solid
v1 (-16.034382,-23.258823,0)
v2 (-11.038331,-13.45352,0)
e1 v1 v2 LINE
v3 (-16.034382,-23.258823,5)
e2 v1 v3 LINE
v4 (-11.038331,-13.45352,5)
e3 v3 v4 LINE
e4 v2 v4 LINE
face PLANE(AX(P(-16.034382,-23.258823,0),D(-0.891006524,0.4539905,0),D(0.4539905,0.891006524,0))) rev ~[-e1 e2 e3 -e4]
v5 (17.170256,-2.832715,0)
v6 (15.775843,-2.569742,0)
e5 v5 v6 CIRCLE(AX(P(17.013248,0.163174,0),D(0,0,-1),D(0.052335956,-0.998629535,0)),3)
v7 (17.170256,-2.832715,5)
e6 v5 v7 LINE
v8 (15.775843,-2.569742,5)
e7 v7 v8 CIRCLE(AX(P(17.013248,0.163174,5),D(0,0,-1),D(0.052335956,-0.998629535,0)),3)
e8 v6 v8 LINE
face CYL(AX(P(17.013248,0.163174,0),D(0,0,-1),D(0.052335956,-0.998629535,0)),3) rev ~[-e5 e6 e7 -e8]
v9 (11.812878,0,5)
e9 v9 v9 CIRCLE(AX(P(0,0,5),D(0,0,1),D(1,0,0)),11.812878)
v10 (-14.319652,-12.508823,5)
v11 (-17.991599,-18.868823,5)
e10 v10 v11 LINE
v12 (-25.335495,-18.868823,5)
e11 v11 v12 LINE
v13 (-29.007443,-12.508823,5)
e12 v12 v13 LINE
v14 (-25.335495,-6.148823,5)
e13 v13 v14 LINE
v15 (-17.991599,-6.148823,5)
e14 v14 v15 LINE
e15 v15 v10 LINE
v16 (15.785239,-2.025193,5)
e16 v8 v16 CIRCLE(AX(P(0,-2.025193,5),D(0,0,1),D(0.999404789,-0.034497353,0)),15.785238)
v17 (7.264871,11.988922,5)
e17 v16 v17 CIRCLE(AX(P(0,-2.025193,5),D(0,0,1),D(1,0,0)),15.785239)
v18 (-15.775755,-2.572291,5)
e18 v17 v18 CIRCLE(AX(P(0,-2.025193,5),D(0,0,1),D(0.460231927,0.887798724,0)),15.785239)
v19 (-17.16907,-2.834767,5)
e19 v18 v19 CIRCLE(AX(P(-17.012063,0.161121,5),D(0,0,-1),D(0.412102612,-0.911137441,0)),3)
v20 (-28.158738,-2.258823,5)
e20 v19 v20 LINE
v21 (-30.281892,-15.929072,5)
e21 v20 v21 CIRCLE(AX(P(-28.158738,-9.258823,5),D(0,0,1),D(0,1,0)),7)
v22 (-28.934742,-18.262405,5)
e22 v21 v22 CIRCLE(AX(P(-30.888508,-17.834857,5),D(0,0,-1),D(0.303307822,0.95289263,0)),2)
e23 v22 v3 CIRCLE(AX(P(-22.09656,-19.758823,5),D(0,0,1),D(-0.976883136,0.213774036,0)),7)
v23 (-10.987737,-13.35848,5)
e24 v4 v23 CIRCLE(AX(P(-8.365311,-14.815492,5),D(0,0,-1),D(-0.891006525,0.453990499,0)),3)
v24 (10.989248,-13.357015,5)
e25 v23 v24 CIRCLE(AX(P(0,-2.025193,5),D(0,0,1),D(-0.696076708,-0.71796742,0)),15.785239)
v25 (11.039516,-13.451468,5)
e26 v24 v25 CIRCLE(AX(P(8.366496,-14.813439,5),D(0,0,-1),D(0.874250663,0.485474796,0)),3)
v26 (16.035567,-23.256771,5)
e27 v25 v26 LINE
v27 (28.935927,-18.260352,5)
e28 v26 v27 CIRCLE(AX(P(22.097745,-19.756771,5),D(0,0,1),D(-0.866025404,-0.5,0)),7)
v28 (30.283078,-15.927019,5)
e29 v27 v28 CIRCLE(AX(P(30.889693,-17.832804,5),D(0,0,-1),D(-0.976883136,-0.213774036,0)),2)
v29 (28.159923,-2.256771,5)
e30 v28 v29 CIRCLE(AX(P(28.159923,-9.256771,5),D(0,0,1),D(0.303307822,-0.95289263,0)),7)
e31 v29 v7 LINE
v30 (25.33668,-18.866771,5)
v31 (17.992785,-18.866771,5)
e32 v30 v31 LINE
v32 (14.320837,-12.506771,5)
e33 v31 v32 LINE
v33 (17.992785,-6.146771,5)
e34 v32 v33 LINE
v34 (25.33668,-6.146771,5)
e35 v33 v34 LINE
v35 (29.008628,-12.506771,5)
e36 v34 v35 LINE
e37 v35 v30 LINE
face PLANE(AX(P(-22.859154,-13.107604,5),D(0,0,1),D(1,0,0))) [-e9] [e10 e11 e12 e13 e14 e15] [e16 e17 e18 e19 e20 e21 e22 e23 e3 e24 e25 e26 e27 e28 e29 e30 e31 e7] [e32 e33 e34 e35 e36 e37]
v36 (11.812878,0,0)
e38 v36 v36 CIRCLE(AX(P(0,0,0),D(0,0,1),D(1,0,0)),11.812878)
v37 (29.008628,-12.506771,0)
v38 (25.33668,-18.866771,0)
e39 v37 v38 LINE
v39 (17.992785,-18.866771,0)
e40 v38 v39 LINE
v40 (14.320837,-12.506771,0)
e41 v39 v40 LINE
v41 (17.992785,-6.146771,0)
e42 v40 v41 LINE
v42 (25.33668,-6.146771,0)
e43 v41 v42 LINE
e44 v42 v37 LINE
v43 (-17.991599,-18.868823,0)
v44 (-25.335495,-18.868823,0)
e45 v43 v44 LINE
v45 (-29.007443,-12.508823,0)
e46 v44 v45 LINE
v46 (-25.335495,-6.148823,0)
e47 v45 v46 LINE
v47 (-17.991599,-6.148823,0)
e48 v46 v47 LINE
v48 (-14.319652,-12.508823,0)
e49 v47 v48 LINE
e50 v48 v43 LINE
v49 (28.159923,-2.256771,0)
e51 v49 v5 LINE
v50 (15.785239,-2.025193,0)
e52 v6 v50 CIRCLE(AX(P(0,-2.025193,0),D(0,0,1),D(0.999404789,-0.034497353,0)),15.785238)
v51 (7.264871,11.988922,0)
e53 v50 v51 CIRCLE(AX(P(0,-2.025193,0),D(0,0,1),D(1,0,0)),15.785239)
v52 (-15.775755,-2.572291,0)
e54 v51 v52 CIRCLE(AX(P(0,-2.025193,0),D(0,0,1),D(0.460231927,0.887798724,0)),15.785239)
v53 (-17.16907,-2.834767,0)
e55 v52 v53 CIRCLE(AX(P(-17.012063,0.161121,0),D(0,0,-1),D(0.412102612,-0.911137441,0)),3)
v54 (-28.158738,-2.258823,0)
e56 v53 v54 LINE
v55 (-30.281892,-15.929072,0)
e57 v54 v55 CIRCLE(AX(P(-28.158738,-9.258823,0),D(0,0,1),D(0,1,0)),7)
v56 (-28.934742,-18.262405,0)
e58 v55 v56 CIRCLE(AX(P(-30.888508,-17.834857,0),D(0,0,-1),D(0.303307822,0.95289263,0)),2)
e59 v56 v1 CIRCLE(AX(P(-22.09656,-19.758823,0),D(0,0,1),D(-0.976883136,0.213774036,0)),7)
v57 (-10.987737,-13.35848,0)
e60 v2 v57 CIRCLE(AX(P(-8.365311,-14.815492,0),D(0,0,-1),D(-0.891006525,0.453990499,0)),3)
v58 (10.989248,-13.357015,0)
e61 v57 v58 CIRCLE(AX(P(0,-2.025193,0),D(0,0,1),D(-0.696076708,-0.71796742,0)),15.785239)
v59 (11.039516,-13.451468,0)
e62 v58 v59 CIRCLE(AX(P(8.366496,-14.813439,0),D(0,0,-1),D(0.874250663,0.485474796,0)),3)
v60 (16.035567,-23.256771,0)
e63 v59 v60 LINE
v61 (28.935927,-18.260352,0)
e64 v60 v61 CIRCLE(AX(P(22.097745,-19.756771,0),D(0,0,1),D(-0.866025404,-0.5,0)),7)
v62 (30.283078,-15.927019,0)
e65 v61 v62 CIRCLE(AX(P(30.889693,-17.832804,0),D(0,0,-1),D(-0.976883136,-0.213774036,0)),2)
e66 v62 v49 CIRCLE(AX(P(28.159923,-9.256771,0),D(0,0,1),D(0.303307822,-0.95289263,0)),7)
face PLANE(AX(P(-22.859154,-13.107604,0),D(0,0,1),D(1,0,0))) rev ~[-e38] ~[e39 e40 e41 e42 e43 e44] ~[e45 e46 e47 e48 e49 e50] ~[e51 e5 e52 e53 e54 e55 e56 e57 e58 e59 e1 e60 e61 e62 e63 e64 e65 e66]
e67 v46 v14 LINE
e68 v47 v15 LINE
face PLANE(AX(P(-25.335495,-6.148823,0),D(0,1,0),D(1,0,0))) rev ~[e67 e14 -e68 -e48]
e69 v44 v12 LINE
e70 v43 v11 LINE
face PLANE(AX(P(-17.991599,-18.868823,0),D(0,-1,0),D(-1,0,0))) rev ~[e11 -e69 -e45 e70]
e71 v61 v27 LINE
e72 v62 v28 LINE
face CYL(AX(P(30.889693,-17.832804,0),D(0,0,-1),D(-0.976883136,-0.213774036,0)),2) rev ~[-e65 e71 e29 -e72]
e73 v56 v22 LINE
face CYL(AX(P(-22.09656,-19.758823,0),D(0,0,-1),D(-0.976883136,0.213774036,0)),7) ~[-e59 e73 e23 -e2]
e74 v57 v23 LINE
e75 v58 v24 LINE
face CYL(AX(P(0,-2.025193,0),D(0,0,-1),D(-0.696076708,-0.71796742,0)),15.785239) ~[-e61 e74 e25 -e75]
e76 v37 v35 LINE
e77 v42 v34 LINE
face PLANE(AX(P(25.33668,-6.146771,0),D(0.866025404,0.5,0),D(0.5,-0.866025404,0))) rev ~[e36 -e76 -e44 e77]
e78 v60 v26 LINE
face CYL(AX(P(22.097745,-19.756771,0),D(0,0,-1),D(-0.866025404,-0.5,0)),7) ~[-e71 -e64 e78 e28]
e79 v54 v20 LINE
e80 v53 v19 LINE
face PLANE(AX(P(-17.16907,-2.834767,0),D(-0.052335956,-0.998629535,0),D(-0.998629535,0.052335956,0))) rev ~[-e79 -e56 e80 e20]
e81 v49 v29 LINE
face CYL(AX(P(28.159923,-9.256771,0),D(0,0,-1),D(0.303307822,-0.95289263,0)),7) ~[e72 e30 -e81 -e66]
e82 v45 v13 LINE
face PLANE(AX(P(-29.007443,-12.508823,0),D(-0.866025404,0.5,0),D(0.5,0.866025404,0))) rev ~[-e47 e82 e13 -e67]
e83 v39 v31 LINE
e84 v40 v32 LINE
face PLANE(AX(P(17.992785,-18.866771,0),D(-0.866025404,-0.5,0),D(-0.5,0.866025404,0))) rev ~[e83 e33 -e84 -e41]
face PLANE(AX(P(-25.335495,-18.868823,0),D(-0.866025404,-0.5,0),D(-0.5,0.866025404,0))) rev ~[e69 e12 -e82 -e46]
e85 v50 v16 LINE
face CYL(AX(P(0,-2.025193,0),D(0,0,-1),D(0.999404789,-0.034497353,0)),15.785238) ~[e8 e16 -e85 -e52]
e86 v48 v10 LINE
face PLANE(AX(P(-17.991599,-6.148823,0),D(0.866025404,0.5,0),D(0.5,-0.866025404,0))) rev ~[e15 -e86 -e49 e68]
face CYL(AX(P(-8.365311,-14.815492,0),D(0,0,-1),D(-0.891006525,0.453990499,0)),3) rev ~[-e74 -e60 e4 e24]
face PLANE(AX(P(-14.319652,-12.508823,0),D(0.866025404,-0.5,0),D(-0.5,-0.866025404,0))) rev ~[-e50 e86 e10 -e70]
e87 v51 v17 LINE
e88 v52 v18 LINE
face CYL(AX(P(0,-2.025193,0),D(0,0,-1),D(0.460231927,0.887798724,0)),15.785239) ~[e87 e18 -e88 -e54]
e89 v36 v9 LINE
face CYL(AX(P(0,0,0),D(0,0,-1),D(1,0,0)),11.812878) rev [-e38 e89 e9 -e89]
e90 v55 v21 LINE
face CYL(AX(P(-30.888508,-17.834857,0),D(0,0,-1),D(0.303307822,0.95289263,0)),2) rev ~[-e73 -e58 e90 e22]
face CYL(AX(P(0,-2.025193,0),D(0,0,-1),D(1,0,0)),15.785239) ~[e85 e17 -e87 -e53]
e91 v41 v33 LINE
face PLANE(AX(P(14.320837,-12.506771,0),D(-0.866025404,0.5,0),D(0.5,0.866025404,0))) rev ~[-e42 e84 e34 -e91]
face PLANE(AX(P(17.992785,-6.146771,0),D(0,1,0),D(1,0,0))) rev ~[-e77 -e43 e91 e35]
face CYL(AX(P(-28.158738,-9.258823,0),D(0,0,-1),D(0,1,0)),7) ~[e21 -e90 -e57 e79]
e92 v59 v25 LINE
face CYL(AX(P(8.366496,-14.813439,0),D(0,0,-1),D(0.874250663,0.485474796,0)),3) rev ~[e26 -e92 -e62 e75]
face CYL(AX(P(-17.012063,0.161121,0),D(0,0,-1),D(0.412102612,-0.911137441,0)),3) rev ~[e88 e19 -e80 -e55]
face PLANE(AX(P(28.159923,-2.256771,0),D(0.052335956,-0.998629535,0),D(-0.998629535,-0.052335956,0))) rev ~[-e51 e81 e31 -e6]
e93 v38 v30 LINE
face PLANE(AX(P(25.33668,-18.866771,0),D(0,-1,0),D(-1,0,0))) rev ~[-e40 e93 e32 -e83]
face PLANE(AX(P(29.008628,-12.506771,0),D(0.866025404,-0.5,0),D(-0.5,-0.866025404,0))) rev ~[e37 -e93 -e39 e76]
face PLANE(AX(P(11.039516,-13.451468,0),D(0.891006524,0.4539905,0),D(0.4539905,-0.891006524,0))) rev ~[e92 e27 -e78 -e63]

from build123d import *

# Parameters (mm, degrees)
F0_R     = 11.8128779822
F1_DEPTH = 5


with BuildPart() as f1:
    # F0 (on Top) → F1 (new body)
    with BuildSketch(Plane.XY):
        with BuildLine():
            ThreePointArc((-10.9877368692, -13.3584800376), (-14.4276328661, -8.4296575195), (-15.7757547816, -2.5722909453))
            ThreePointArc((-15.7757547816, -2.5722909453), (-16.4566838692, -2.7870228586), (-17.1690704864, -2.8347672253))
            Line((-17.1690704864, -2.8347672253), (-28.1587377075, -2.2588231712))
            ThreePointArc((-28.1587377075, -2.2588231712), (-35.0758085793, -8.184518487), (-30.2818924612, -15.9290715842))
            ThreePointArc((-30.2818924612, -15.9290715842), (-29.1564572976, -16.8348568451), (-28.9347418331, -18.2624049175))
            ThreePointArc((-28.9347418331, -18.2624049175), (-24.6247201691, -26.286334608), (-16.0343820545, -23.2588231712))
            Line((-16.0343820545, -23.2588231712), (-11.038330626, -13.4535201515))
            ThreePointArc((-11.038330626, -13.4535201515), (-11.0134601469, -13.4057731047), (-10.9877368692, -13.3584800376))
        make_face()
        Polygon((-29.0074426032, -12.5088231712), (-25.3354948912, -6.1488231712), (-17.9915994671, -6.1488231712), (-14.319651755, -12.5088231712), (-17.9915994671, -18.8688231712), (-25.3354948912, -18.8688231712), align=None, mode=Mode.SUBTRACT)
        with BuildLine():
            ThreePointArc((15.7758429715, -2.5697420135), (15.7828894553, -2.2975080655), (15.7852385163, -2.0251930691))
            ThreePointArc((15.7852385163, -2.0251930691), (13.4879848824, 6.1752958693), (7.264870736, 11.9889215374))
            ThreePointArc((7.264870736, 11.9889215374), (-8.4330311307, 11.3186347537), (-15.7757547816, -2.5722909453))
            ThreePointArc((-15.7757547816, -2.5722909453), (-14.4276328661, -8.4296575195), (-10.9877368692, -13.3584800376))
            ThreePointArc((-10.9877368692, -13.3584800376), (0.0010524985, -17.8104315503), (10.9892480908, -13.3570146974))
            ThreePointArc((10.9892480908, -13.3570146974), (14.4285771261, -8.4275299185), (15.7758429715, -2.5697420135))
        make_face()
        Circle(F0_R, mode=Mode.SUBTRACT)
        with BuildLine():
            ThreePointArc((17.1702555345, -2.8327146617), (16.4572773621, -2.784858795), (15.7758429715, -2.5697420135))
            ThreePointArc((15.7758429715, -2.5697420135), (14.4285771261, -8.4275299185), (10.9892480908, -13.3570146974))
            ThreePointArc((10.9892480908, -13.3570146974), (11.0148030033, -13.4040170233), (11.0395156741, -13.451467588))
            Line((11.0395156741, -13.451467588), (16.0355671026, -23.2567706076))
            ThreePointArc((16.0355671026, -23.2567706076), (24.6259052172, -26.2842820445), (28.9359268812, -18.260352354))
            ThreePointArc((28.9359268812, -18.260352354), (29.1576423457, -16.8328042815), (30.2830775093, -15.9270190207))
            ThreePointArc((30.2830775093, -15.9270190207), (35.0769936274, -8.1824659235), (28.1599227556, -2.2567706076))
            Line((28.1599227556, -2.2567706076), (17.1702555345, -2.8327146617))
        make_face()
        Polygon((25.3366799393, -18.8667706076), (17.9927845152, -18.8667706076), (14.3208368031, -12.5067706076), (17.9927845152, -6.1467706076), (25.3366799393, -6.1467706076), (29.0086276513, -12.5067706076), align=None, mode=Mode.SUBTRACT)
    extrude(amount=F1_DEPTH)


solid = f1.part
